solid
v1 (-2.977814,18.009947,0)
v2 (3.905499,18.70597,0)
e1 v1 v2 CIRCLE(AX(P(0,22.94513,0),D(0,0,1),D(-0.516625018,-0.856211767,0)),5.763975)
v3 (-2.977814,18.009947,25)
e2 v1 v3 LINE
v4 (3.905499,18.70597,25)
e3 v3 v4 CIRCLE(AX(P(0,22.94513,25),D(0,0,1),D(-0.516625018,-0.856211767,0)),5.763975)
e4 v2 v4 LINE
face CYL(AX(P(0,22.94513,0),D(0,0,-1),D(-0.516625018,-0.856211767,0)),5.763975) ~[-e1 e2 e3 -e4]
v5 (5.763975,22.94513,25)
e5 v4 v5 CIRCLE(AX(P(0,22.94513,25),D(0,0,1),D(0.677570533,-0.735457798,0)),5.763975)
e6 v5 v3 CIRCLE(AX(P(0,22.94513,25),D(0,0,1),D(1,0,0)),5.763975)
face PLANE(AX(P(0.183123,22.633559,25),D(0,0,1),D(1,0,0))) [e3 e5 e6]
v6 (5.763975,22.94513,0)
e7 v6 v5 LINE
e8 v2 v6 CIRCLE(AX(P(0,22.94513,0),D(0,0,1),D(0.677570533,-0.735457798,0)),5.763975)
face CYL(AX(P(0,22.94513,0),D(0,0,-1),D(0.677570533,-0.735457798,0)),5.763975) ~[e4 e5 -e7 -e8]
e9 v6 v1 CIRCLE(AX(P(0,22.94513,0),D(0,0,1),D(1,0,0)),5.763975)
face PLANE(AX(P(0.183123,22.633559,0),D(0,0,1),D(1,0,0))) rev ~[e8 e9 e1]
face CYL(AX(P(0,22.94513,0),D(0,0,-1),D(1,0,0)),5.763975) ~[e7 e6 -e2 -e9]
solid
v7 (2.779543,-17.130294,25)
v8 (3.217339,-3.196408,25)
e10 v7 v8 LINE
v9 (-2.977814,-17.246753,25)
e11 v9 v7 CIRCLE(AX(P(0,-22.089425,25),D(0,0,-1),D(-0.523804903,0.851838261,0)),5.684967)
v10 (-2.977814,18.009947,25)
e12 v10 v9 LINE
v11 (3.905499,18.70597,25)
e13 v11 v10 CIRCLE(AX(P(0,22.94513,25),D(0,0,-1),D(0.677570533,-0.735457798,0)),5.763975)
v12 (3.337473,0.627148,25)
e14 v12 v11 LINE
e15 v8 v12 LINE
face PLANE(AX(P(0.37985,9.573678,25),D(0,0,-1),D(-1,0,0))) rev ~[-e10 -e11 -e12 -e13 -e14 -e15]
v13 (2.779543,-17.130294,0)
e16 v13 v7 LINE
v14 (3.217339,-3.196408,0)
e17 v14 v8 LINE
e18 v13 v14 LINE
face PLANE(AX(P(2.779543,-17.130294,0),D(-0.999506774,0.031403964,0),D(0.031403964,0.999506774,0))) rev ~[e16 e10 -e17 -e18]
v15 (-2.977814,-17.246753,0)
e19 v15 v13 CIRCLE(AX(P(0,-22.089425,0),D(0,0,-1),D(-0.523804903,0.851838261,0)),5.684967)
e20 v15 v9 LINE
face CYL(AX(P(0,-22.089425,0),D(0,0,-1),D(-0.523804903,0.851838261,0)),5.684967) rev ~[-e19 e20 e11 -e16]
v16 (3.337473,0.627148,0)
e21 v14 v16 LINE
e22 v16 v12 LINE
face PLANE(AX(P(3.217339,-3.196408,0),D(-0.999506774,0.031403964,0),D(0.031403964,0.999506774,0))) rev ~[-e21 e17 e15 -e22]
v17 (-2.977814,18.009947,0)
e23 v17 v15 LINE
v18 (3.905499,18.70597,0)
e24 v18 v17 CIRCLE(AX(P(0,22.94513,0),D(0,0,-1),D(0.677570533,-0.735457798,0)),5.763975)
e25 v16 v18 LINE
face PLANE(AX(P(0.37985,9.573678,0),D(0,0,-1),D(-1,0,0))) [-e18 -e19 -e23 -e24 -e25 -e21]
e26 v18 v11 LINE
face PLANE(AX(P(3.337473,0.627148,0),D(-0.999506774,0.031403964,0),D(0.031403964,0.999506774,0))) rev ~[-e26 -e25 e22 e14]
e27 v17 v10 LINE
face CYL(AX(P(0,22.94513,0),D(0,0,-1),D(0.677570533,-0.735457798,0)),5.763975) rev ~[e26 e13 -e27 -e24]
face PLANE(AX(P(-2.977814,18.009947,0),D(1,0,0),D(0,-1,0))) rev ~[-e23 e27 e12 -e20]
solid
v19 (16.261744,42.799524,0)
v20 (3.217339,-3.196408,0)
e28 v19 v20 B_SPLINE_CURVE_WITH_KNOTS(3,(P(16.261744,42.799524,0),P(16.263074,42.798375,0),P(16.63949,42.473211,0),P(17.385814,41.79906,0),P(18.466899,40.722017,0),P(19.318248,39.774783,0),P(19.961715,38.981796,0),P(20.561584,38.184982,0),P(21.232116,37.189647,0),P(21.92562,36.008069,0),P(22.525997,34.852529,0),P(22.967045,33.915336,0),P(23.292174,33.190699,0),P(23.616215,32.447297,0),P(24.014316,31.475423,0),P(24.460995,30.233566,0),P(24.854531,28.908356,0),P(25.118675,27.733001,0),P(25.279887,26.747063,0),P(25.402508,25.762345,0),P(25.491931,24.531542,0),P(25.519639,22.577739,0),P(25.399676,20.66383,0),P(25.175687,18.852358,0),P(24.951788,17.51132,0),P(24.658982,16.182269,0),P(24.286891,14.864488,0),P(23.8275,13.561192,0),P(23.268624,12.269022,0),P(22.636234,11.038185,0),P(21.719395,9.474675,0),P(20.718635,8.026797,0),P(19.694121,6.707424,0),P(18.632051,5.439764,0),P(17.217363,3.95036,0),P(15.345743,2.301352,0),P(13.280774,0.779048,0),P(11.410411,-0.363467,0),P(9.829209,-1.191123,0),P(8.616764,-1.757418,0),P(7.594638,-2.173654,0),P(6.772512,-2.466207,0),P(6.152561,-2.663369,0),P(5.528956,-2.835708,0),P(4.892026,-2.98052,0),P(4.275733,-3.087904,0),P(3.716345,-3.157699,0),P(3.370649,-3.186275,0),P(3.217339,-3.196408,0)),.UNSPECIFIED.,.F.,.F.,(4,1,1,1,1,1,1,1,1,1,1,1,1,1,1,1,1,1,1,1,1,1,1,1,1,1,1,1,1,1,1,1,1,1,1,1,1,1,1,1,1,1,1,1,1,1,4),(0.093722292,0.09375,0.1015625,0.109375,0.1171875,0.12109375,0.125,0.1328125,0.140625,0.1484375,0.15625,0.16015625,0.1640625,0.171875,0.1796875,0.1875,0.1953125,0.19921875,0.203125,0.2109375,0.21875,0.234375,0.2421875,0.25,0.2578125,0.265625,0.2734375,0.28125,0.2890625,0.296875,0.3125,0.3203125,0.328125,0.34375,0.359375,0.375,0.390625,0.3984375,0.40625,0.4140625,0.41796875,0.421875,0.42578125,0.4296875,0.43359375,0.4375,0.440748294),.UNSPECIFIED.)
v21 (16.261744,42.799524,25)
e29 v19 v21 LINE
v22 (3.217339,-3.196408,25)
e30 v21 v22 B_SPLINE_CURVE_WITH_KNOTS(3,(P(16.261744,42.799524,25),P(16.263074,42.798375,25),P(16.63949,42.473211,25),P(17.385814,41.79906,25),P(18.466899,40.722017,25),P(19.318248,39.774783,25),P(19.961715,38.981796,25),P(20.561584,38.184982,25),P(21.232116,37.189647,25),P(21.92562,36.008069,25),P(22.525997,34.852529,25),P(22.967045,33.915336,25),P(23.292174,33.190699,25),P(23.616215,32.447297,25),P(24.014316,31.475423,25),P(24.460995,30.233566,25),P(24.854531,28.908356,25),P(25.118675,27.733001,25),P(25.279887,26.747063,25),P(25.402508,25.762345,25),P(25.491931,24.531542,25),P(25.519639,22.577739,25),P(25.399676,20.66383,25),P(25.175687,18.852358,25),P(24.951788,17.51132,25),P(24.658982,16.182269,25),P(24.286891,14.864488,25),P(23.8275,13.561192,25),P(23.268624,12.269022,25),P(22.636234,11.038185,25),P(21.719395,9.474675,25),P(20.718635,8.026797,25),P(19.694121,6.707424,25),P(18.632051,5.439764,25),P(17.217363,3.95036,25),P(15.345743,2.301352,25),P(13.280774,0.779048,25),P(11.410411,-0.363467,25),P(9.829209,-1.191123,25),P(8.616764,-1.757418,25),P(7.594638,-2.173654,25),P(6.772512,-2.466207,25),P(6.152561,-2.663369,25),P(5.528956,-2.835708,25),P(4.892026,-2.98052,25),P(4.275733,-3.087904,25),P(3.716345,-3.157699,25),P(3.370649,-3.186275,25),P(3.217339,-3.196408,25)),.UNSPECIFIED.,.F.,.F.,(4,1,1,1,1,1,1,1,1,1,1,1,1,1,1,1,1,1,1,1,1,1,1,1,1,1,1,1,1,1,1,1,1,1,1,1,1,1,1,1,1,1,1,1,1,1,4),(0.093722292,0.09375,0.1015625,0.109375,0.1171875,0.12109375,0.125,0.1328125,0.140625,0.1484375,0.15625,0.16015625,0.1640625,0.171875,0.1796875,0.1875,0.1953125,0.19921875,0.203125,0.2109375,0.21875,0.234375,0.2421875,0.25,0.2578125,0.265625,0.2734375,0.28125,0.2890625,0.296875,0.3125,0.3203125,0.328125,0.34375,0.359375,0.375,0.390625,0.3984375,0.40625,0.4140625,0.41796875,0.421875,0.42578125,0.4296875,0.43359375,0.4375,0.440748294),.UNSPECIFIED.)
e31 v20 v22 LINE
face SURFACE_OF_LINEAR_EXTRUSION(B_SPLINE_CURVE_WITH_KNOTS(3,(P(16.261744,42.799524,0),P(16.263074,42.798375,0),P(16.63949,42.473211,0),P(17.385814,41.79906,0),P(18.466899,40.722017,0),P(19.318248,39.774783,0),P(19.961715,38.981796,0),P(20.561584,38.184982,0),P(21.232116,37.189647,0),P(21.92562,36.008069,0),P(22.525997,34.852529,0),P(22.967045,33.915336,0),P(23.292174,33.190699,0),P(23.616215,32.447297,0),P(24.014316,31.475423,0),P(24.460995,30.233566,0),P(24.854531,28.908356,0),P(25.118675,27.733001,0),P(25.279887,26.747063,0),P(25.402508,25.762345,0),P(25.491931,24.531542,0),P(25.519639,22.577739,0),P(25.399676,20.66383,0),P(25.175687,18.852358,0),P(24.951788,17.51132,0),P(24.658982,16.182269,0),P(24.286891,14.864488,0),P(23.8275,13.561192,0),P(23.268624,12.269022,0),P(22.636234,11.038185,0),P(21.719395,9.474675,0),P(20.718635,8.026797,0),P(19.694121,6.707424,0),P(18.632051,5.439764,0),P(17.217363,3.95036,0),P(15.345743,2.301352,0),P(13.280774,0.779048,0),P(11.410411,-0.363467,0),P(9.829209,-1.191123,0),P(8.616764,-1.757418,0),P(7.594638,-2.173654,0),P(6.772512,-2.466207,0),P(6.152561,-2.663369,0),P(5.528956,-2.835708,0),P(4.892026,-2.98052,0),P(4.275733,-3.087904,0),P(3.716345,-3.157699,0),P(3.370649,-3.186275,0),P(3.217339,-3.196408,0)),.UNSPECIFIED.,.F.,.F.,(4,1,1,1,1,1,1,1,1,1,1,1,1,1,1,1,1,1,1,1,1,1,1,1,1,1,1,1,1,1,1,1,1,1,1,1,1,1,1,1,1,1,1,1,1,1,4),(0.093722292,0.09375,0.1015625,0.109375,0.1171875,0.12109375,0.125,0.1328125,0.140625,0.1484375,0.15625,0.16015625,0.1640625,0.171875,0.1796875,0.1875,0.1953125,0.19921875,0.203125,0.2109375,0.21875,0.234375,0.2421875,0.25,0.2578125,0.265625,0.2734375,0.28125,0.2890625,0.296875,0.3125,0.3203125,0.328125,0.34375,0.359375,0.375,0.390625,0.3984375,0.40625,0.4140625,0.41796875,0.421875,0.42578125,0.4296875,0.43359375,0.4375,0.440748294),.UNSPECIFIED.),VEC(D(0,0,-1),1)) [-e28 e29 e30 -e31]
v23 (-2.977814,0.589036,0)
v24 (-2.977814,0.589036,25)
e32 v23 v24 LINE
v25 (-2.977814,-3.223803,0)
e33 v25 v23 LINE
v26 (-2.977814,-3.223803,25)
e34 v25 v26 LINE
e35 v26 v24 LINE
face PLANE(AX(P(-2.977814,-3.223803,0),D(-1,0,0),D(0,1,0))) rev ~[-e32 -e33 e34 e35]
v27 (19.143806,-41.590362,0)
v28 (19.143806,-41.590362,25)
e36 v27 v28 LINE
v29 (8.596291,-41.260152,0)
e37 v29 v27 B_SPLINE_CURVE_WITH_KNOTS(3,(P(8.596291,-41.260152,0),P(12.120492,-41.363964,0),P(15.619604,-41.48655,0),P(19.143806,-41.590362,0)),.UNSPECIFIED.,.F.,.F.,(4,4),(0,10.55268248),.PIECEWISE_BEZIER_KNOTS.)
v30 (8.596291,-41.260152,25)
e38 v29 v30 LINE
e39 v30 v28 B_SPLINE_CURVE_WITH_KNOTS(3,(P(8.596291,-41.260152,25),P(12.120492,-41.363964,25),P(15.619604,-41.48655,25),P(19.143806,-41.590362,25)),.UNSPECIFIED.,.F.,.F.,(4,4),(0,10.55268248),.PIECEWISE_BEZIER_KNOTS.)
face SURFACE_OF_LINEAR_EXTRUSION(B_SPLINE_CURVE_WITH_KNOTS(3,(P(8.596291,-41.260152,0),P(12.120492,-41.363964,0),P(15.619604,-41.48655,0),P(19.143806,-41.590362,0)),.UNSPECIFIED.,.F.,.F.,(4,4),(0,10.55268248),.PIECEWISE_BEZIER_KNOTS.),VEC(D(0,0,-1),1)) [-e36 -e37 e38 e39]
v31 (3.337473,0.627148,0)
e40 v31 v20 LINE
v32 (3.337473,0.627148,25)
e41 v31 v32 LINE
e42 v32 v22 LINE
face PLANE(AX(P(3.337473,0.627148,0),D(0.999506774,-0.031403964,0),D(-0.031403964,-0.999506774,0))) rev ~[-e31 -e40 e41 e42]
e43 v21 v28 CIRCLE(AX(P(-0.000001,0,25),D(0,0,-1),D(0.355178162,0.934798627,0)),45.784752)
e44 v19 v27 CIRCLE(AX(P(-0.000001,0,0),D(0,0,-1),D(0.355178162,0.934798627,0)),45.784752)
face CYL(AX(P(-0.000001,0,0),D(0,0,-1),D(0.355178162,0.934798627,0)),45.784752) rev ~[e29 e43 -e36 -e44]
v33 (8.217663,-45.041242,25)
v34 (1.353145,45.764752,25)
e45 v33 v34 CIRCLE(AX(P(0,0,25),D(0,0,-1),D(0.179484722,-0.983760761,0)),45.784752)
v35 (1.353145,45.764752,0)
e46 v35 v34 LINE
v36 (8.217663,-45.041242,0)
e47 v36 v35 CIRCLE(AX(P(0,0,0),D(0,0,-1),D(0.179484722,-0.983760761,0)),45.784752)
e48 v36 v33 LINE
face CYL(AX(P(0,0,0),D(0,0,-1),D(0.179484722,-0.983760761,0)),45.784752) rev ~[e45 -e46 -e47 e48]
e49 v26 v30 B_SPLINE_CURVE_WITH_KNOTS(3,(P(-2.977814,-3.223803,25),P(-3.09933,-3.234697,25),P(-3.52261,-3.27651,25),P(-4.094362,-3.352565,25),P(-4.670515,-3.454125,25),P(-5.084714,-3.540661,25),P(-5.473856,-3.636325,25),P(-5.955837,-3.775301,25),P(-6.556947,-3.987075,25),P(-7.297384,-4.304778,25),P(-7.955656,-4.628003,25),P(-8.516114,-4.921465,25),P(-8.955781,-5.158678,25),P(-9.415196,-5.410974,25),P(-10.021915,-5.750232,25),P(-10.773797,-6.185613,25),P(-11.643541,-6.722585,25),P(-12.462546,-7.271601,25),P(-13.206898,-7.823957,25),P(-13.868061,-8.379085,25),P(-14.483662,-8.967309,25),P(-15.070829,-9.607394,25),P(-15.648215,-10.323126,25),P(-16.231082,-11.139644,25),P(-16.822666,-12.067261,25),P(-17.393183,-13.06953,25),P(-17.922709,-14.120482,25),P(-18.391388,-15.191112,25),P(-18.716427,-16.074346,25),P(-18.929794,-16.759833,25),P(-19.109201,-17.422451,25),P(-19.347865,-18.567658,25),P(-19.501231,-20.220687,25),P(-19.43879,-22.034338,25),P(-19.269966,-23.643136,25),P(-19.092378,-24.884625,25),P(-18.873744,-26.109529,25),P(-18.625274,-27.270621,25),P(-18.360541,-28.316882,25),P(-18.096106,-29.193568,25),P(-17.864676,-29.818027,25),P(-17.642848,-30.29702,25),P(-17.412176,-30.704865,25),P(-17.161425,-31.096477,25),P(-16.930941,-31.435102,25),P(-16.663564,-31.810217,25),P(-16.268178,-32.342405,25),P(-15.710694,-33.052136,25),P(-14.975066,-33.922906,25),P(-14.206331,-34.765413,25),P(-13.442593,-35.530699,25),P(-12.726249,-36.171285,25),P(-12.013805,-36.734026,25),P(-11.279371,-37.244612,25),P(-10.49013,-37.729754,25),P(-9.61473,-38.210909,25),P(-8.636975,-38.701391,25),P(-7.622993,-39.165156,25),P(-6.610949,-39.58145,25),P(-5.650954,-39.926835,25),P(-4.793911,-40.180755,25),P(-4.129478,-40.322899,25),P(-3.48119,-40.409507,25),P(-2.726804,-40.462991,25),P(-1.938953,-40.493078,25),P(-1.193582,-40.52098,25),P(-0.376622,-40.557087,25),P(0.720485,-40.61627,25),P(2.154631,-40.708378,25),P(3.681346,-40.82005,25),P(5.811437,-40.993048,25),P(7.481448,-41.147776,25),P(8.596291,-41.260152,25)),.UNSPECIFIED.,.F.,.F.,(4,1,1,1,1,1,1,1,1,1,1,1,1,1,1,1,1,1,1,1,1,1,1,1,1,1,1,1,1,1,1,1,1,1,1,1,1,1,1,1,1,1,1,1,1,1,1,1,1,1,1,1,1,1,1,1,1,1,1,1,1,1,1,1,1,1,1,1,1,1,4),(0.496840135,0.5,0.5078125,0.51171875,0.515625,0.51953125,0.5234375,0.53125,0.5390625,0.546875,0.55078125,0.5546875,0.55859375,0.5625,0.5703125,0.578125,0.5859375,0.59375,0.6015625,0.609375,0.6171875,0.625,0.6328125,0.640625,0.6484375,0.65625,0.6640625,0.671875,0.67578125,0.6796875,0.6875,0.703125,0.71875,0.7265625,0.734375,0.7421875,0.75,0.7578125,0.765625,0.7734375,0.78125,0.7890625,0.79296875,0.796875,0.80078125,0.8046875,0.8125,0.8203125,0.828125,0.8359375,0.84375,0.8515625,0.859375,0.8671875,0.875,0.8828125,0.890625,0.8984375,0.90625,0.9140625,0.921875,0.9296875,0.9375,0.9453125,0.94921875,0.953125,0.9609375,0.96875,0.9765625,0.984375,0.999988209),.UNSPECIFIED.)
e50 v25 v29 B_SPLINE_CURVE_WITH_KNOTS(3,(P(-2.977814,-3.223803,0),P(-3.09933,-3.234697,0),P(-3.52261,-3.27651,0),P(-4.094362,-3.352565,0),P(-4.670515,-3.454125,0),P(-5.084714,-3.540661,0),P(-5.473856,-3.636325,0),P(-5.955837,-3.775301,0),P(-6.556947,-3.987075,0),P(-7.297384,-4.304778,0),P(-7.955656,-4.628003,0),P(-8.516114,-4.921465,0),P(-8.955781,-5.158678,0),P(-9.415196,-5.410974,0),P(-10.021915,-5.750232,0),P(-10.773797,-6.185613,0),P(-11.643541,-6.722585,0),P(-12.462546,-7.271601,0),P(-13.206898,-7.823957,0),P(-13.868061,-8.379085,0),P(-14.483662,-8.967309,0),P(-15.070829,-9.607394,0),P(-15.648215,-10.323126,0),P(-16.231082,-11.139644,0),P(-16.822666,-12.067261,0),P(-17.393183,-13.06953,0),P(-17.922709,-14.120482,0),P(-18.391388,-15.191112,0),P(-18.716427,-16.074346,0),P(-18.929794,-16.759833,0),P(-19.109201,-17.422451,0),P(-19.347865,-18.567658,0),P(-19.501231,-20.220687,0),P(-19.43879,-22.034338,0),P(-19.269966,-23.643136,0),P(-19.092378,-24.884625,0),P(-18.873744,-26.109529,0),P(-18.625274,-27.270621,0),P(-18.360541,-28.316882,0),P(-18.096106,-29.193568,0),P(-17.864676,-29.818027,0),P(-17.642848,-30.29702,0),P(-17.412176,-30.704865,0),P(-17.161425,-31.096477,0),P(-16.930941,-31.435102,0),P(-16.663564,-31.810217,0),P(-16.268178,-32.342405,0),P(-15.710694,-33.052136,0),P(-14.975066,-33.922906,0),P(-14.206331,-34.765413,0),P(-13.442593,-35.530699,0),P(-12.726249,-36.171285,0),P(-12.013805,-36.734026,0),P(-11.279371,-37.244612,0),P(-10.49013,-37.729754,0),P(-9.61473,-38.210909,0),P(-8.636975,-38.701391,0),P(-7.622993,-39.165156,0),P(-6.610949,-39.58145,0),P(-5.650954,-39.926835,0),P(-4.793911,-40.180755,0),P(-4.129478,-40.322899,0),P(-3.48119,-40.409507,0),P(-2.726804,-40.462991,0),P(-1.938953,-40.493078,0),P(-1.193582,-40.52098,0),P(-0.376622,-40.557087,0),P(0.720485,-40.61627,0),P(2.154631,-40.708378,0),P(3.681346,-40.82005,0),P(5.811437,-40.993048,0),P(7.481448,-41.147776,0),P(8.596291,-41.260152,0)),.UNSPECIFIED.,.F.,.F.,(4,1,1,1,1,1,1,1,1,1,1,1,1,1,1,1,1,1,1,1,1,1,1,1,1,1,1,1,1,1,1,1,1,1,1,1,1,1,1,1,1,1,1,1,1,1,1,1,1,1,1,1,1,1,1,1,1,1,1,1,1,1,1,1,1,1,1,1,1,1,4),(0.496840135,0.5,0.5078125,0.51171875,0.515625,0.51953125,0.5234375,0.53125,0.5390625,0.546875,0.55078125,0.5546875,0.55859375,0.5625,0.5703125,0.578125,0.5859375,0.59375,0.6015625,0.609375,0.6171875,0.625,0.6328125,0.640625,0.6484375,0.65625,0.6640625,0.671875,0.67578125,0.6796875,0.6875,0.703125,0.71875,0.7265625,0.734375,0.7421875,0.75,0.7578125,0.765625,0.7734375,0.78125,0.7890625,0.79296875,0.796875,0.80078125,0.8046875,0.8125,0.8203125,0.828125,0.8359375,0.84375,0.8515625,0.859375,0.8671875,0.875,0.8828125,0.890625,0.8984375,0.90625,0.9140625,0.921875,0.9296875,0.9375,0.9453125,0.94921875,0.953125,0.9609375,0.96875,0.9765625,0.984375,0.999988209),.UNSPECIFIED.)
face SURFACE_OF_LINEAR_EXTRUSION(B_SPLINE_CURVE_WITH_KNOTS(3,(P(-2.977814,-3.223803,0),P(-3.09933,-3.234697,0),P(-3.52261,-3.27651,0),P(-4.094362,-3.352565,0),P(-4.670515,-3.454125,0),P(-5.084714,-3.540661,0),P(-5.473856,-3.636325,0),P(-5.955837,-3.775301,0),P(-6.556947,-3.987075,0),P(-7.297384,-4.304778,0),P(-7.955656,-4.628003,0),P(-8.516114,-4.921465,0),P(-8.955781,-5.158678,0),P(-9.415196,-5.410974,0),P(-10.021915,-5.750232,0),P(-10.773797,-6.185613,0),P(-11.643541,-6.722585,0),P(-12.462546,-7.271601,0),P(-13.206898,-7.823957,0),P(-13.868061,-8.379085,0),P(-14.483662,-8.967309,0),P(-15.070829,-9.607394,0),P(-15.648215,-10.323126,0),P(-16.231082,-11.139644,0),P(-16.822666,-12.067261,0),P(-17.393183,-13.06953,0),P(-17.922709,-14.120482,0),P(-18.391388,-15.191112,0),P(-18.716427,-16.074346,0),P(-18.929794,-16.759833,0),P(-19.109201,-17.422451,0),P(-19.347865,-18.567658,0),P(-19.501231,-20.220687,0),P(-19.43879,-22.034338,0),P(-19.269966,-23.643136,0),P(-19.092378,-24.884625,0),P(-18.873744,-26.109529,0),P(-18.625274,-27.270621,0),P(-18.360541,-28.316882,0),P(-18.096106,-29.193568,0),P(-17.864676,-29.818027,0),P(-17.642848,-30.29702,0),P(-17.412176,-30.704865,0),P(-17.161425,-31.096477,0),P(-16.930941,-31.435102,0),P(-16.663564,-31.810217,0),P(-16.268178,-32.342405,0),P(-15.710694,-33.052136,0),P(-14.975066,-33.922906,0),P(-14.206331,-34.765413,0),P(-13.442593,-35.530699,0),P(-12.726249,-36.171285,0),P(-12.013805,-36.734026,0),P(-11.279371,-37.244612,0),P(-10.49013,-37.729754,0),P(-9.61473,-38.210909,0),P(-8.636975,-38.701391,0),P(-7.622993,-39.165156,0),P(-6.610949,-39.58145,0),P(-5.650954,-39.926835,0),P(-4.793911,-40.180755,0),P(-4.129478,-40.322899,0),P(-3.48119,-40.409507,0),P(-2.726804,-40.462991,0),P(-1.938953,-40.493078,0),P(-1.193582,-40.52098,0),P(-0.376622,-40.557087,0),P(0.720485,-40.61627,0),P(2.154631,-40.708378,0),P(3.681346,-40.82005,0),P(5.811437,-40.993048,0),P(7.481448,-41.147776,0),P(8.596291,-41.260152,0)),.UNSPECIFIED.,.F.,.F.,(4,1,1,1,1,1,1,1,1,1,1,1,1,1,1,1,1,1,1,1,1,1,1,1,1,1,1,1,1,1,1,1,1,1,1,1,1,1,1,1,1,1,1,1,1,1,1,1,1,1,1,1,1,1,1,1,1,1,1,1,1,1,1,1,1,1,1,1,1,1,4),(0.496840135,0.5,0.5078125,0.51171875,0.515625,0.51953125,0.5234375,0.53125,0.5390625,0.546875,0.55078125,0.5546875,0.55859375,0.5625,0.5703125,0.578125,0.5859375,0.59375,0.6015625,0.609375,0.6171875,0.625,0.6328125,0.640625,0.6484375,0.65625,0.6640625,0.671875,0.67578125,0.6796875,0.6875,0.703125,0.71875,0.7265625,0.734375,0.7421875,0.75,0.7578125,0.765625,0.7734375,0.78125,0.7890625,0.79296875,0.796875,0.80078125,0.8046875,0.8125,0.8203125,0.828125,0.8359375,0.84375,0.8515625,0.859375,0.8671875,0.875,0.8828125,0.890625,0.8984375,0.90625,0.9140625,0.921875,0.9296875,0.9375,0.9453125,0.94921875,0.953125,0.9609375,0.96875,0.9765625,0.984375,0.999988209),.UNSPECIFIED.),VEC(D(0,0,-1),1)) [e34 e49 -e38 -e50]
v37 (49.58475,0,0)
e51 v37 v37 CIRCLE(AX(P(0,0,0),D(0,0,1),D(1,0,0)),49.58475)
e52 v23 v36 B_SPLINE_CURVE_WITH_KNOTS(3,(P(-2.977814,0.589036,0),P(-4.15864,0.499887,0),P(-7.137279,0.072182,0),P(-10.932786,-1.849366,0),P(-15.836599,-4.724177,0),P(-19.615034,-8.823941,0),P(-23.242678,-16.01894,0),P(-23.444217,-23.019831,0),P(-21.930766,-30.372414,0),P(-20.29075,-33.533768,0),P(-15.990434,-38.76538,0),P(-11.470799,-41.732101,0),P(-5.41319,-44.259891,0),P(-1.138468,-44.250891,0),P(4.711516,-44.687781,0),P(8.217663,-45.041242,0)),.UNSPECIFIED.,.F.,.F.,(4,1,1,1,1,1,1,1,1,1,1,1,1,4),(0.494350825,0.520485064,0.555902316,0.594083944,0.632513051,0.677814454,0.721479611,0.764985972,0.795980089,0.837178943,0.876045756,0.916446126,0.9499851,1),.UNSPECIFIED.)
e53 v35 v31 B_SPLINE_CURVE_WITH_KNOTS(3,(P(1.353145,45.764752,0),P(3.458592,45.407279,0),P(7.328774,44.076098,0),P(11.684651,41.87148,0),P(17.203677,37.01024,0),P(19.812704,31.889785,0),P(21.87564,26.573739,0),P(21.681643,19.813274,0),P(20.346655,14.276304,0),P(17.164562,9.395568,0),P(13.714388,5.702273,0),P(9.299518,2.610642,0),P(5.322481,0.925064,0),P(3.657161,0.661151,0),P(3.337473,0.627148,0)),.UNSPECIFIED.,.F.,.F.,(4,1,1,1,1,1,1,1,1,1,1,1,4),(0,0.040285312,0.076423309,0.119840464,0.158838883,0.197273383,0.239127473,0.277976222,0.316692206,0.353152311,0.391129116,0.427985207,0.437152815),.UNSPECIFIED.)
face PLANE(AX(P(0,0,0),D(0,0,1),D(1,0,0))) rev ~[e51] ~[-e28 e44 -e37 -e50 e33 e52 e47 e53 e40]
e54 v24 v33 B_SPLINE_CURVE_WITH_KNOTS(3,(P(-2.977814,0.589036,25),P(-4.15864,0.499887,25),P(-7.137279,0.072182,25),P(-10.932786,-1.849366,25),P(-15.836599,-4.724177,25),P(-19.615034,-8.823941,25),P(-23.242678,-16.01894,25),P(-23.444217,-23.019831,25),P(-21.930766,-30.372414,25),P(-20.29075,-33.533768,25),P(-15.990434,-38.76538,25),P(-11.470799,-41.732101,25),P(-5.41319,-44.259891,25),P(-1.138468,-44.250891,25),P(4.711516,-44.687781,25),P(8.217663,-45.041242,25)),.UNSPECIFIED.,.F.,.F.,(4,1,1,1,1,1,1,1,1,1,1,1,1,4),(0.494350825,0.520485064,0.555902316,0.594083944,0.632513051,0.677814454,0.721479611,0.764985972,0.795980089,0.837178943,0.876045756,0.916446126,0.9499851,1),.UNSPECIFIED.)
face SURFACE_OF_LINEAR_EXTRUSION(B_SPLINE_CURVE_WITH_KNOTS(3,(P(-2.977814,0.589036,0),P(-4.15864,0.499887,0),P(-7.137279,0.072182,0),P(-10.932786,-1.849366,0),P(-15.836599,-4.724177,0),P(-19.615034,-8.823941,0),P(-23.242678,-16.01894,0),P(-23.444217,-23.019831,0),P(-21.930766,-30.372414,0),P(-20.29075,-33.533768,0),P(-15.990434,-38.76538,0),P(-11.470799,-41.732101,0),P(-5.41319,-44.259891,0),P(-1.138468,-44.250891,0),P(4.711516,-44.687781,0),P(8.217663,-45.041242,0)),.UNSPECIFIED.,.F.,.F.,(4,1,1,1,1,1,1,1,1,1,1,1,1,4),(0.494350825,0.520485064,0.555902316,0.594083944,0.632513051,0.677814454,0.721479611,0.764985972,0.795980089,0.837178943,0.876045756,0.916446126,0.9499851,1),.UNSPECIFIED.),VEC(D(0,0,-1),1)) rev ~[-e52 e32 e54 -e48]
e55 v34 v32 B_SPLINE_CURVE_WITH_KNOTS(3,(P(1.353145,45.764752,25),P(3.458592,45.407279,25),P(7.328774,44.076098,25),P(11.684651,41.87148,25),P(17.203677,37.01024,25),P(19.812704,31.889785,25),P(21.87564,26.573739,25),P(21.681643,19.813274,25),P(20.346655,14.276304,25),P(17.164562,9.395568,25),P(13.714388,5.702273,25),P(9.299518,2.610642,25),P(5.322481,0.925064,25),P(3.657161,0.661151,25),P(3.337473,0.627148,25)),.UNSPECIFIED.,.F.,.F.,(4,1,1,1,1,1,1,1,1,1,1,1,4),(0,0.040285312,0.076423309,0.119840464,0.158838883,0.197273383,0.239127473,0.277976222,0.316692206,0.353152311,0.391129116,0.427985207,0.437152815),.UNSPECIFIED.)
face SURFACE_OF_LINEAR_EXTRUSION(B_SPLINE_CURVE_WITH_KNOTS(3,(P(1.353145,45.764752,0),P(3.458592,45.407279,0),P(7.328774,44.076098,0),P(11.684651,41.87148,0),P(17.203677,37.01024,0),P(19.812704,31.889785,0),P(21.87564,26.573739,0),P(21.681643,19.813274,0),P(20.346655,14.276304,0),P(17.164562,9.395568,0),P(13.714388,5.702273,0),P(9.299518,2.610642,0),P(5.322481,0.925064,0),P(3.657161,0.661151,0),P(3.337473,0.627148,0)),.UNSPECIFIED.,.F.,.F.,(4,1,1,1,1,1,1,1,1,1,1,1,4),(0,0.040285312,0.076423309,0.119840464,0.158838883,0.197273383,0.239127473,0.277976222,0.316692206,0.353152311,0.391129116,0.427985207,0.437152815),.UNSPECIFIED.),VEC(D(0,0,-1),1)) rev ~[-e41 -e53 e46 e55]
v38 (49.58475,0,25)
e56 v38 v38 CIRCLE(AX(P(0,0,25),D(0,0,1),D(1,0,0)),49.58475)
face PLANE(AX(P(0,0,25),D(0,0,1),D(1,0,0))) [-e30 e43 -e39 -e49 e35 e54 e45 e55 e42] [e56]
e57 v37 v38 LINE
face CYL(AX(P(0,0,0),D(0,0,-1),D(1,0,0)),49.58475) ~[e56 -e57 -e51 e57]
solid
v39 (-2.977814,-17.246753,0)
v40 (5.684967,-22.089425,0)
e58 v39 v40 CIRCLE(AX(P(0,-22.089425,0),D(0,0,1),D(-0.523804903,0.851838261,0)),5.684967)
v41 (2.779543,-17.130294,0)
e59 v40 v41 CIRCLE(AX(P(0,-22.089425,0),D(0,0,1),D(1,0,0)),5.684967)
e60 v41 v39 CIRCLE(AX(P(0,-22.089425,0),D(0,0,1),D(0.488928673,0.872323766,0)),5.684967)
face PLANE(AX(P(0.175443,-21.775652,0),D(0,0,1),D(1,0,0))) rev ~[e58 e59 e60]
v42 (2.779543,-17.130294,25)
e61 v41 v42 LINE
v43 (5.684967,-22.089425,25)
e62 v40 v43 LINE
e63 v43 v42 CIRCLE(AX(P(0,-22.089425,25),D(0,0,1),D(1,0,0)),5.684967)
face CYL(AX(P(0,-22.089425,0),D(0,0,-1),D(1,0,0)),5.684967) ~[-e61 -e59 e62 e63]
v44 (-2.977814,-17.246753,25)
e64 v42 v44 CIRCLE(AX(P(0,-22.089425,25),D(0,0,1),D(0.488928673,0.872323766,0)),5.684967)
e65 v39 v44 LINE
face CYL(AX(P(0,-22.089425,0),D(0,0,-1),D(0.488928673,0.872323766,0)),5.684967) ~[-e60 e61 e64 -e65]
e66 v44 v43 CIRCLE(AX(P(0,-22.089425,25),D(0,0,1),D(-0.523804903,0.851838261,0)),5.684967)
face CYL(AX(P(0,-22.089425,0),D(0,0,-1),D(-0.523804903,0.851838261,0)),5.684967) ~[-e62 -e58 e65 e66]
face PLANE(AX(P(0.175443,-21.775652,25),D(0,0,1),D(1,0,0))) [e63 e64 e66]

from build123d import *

# Parameters (mm, degrees)
F0_R     = 49.5847500937
F1_DEPTH = 25
F2_DEPTH = 25
F3_DEPTH = 25


# Not quite as in the source:
# - ends of sketch curves that miss each other by under 0.0002 mm in the source are joined
# - the dataset's text gives a spline's control points without its knots; the knots are read off the source's solid


with BuildPart() as f1:
    # F0 (on Top) → F1 (new body)
    with BuildSketch(Plane.XY):
        Circle(F0_R)
        with BuildLine():
            ThreePointArc((8.2176634504, -45.0412423256), (-45.6544875488, -3.451270704), (1.3531451114, 45.7647517323))
            add(Edge.make_bspline(
                [(1.3531451114, 45.7647517323), (3.4585917741, 45.4072790873), (7.3287739419, 44.0760975566), (11.6846514785, 41.8714803536), (17.2036766267, 37.0102398582), (19.8127043525, 31.889785288), (21.8756398334, 26.5737392046), (21.6816430924, 19.8132738016), (20.3466547431, 14.27630368), (17.1645617239, 9.3955679535), (13.7143876632, 5.7022727088), (9.2995178681, 2.6106423405), (5.3224811985, 0.9250643675), (3.6571614218, 0.6611514177), (3.3374725899, 0.6271477481)],
                knots=[0, 0, 0, 0, 0.0402853124, 0.0764233093, 0.1198404643, 0.1588388833, 0.1972733831, 0.2391274731, 0.2779762224, 0.316692206, 0.3531523115, 0.3911291162, 0.4279852066, 0.4371528151, 0.4371528151, 0.4371528151, 0.4371528151], degree=3))
            Line((3.3374725899, 0.6271477481), (3.2173385291, -3.1964079792))
            add(Edge.make_bspline(
                [(16.2617436608, 42.799524033), (16.2630739599, 42.7983750489), (16.6394904754, 42.4732106597), (17.3858142501, 41.7990598434), (18.4668991951, 40.7220167717), (19.3182477466, 39.7747828486), (19.9617151083, 38.9817963008), (20.5615839282, 38.1849818374), (21.2321159557, 37.1896473658), (21.9256201889, 36.0080693011), (22.5259973397, 34.8525285732), (22.9670449801, 33.9153363369), (23.2921740837, 33.1906991104), (23.6162146728, 32.4472971946), (24.0143162389, 31.4754225057), (24.4609945217, 30.2335663035), (24.8545309775, 28.9083557538), (25.1186753026, 27.7330012889), (25.2798865775, 26.7470627199), (25.4025078808, 25.7623445898), (25.4919314322, 24.5315424236), (25.5196391676, 22.5777387036), (25.3996756527, 20.6638298862), (25.1756871665, 18.8523584922), (24.9517875546, 17.5113201902), (24.6589823135, 16.1822687794), (24.2868913691, 14.8644876192), (23.8274995758, 13.5611922588), (23.2686241638, 12.2690224458), (22.636234168, 11.0381846903), (21.7193953434, 9.4746754172), (20.7186347445, 8.0267968339), (19.6941212898, 6.7074239992), (18.6320508644, 5.4397638391), (17.2173630119, 3.9503603048), (15.3457425226, 2.3013523369), (13.2807742381, 0.7790477359), (11.410410694, -0.3634671801), (9.8292090796, -1.1911232786), (8.6167642486, -1.7574183512), (7.5946383314, -2.1736542592), (6.7725118163, -2.466207369), (6.1525609715, -2.6633692461), (5.5289556877, -2.8357079446), (4.8920257832, -2.9805203679), (4.2757329412, -3.0879036918), (3.7163451386, -3.1576990689), (3.3706493697, -3.1862748398), (3.2173385291, -3.1964079792)],
                knots=[0.0937222925, 0.0937222925, 0.0937222925, 0.0937222925, 0.09375, 0.1015625, 0.109375, 0.1171875, 0.12109375, 0.125, 0.1328125, 0.140625, 0.1484375, 0.15625, 0.16015625, 0.1640625, 0.171875, 0.1796875, 0.1875, 0.1953125, 0.19921875, 0.203125, 0.2109375, 0.21875, 0.234375, 0.2421875, 0.25, 0.2578125, 0.265625, 0.2734375, 0.28125, 0.2890625, 0.296875, 0.3125, 0.3203125, 0.328125, 0.34375, 0.359375, 0.375, 0.390625, 0.3984375, 0.40625, 0.4140625, 0.41796875, 0.421875, 0.42578125, 0.4296875, 0.43359375, 0.4375, 0.4407482936, 0.4407482936, 0.4407482936, 0.4407482936], degree=3))
            ThreePointArc((16.2617436608, 42.799524033), (45.7580748478, 1.562718476), (19.1438057271, -41.5903619256))
            add(Edge.make_bspline(
                [(8.5962909195, -41.260151535), (12.1204923737, -41.363963585), (15.6196042728, -41.4865498756), (19.1438057271, -41.5903619256)],
                knots=[0, 0, 0, 0, 10.5526824798, 10.5526824798, 10.5526824798, 10.5526824798], degree=3))
            add(Edge.make_bspline(
                [(-2.9778135602, -3.2238034948), (-3.0993303434, -3.2346970109), (-3.5226099021, -3.2765098979), (-4.0943616278, -3.3525652097), (-4.6705152555, -3.4541250007), (-5.0847144346, -3.5406614246), (-5.4738562213, -3.6363249493), (-5.9558372613, -3.7753006958), (-6.5569469588, -3.9870752932), (-7.2973844437, -4.3047776604), (-7.9556555023, -4.6280032377), (-8.5161141524, -4.9214653693), (-8.9557811473, -5.1586784651), (-9.4151958546, -5.4109743655), (-10.0219149467, -5.7502319027), (-10.7737966428, -6.1856132196), (-11.6435407711, -6.7225847478), (-12.4625455113, -7.2716014199), (-13.2068980448, -7.8239565682), (-13.8680607713, -8.3790853884), (-14.4836619801, -8.9673086499), (-15.0708287585, -9.6073944046), (-15.6482154954, -10.3231261961), (-16.2310819184, -11.1396443892), (-16.8226660281, -12.067261276), (-17.3931826033, -13.069530031), (-17.9227093669, -14.1204821222), (-18.3913882315, -15.1911115172), (-18.7164274723, -16.0743456961), (-18.9297942343, -16.7598333424), (-19.1092008222, -17.4224508448), (-19.3478650369, -18.567657804), (-19.5012310474, -20.2206869085), (-19.4387898602, -22.0343384025), (-19.2699656101, -23.6431361243), (-19.0923777518, -24.8846250566), (-18.8737440335, -26.1095288943), (-18.625273925, -27.270620982), (-18.3605406415, -28.3168815895), (-18.0961057427, -29.1935677611), (-17.8646757486, -29.8180269836), (-17.6428484123, -30.2970196235), (-17.4121763438, -30.7048654836), (-17.1614245266, -31.0964767945), (-16.9309413758, -31.4351019183), (-16.6635644382, -31.8102169288), (-16.2681781339, -32.3424050242), (-15.7106938903, -33.0521363879), (-14.975065644, -33.9229060282), (-14.2063314903, -34.7654131508), (-13.4425929357, -35.5306986434), (-12.7262486355, -36.1712848535), (-12.0138047109, -36.7340261464), (-11.2793708954, -37.2446124357), (-10.4901303857, -37.7297538058), (-9.6147303473, -38.2109085157), (-8.6369747009, -38.7013911181), (-7.6229933124, -39.1651555732), (-6.6109485553, -39.5814499067), (-5.6509540017, -39.9268354746), (-4.7939114132, -40.1807551658), (-4.129478245, -40.3228988125), (-3.4811896898, -40.4095071611), (-2.7268043347, -40.4629905381), (-1.938953452, -40.4930779164), (-1.1935823718, -40.5209796742), (-0.3766220477, -40.5570865106), (0.7204845182, -40.6162695454), (2.1546311267, -40.7083776943), (3.6813461565, -40.8200495776), (5.8114367714, -40.9930475683), (7.4814477769, -41.1477758014), (8.5962909195, -41.260151535)],
                knots=[0.4968401346, 0.4968401346, 0.4968401346, 0.4968401346, 0.5, 0.5078125, 0.51171875, 0.515625, 0.51953125, 0.5234375, 0.53125, 0.5390625, 0.546875, 0.55078125, 0.5546875, 0.55859375, 0.5625, 0.5703125, 0.578125, 0.5859375, 0.59375, 0.6015625, 0.609375, 0.6171875, 0.625, 0.6328125, 0.640625, 0.6484375, 0.65625, 0.6640625, 0.671875, 0.67578125, 0.6796875, 0.6875, 0.703125, 0.71875, 0.7265625, 0.734375, 0.7421875, 0.75, 0.7578125, 0.765625, 0.7734375, 0.78125, 0.7890625, 0.79296875, 0.796875, 0.80078125, 0.8046875, 0.8125, 0.8203125, 0.828125, 0.8359375, 0.84375, 0.8515625, 0.859375, 0.8671875, 0.875, 0.8828125, 0.890625, 0.8984375, 0.90625, 0.9140625, 0.921875, 0.9296875, 0.9375, 0.9453125, 0.94921875, 0.953125, 0.9609375, 0.96875, 0.9765625, 0.984375, 0.9999882092, 0.9999882092, 0.9999882092, 0.9999882092], degree=3))
            Line((-2.9778135602, -3.2238034948), (-2.9778135602, 0.5890359777))
            add(Edge.make_bspline(
                [(-2.9778135602, 0.5890359777), (-4.1586395197, 0.4998871799), (-7.1372789822, 0.0721815891), (-10.9327858042, -1.8493664697), (-15.8365992647, -4.7241770818), (-19.6150340779, -8.8239411152), (-23.2426783003, -16.0189399303), (-23.4442169592, -23.0198313597), (-21.9307663935, -30.3724139092), (-20.290749593, -33.533767655), (-15.9904342503, -38.7653797506), (-11.4707989198, -41.7321009373), (-5.4131902795, -44.2598907097), (-1.1384676764, -44.2508911848), (4.71151601, -44.6877810107), (8.2176634504, -45.0412423256)],
                knots=[0.4943508245, 0.4943508245, 0.4943508245, 0.4943508245, 0.5204850635, 0.5559023161, 0.5940839436, 0.6325130511, 0.6778144538, 0.7214796109, 0.7649859717, 0.7959800891, 0.8371789433, 0.8760457564, 0.9164461256, 0.9499850996, 1, 1, 1, 1], degree=3))
        make_face(mode=Mode.SUBTRACT)
    extrude(amount=F1_DEPTH)


with BuildPart() as f2:
    # F0 (on Top) → F2 (new body)
    with BuildSketch(Plane.XY):
        with BuildLine():
            ThreePointArc((-2.9778135602, 18.0099472335), (0.579881213, 17.2103989752), (3.905499446, 18.705970065))
            ThreePointArc((3.905499446, 18.705970065), (5.2789490027, 20.6308047759), (5.7639747523, 22.9451302439))
            ThreePointArc((5.7639747523, 22.9451302439), (-2.8336692438, 27.9644652159), (-2.9778135602, 18.0099472335))
        make_face()
    extrude(amount=F2_DEPTH)


with BuildPart() as f2b:
    # F0 (on Top) → F2, piece 2 (new body)
    with BuildSketch(Plane.XY):
        with BuildLine():
            ThreePointArc((5.6849669477, -22.0894254744), (4.9051228964, -19.2156442427), (2.7795433476, -17.1302936981))
            ThreePointArc((2.7795433476, -17.1302936981), (-0.1149715971, -16.4056212266), (-2.9778135602, -17.2467531133))
            ThreePointArc((-2.9778135602, -17.2467531133), (-2.7739932886, -27.051663924), (5.6849669477, -22.0894254744))
        make_face()
    extrude(amount=F2_DEPTH)


with BuildPart() as f3:
    # F0 (on Top) → F3 (new body)
    with BuildSketch(Plane.XY):
        with BuildLine():
            add(Edge.make_bspline(
                [(3.3374725899, 0.6271477481), (2.7022433704, 0.5595816578), (1.179826551, 0.5744434161), (-0.8120762037, 0.7033344618), (-2.5254644471, 0.6231869712), (-2.9778135602, 0.5890359777)],
                knots=[0.4371528151, 0.4371528151, 0.4371528151, 0.4371528151, 0.4553690688, 0.4843393577, 0.4943508245, 0.4943508245, 0.4943508245, 0.4943508245], degree=3))
            Line((3.3374725899, 0.6271477481), (3.905499446, 18.705970065))
            ThreePointArc((3.905499446, 18.705970065), (0.579881213, 17.2103989752), (-2.9778135602, 18.0099472335))
            Line((-2.9778135602, 18.0099472335), (-2.9778135602, 0.5890359777))
        make_face()
        with BuildLine():
            Line((2.7795433476, -17.1302936981), (3.2173385291, -3.1964079792))
            add(Edge.make_bspline(
                [(3.2173385291, -3.1964079792), (3.0019201003, -3.2106461438), (2.4372674095, -3.2340467099), (1.7724022915, -3.2260045079), (1.2057258422, -3.207691837), (0.6565254191, -3.1863181965), (-0.002185073, -3.1588329743), (-0.7797750652, -3.1381263752), (-1.5744376242, -3.1401181706), (-2.3217399341, -3.1714582791), (-2.7988903766, -3.2077637137), (-2.9778135602, -3.2238034948)],
                knots=[0.4407482936, 0.4407482936, 0.4407482936, 0.4407482936, 0.4453125, 0.453125, 0.45703125, 0.4609375, 0.46875, 0.4765625, 0.484375, 0.4921875, 0.4968401346, 0.4968401346, 0.4968401346, 0.4968401346], degree=3))
            Line((-2.9778135602, -3.2238034948), (-2.9778135602, -17.2467531133))
            ThreePointArc((-2.9778135602, -17.2467531133), (-0.1149715971, -16.4056212266), (2.7795433476, -17.1302936981))
        make_face()
        with BuildLine():
            Line((3.2173385291, -3.1964079792), (3.3374725899, 0.6271477481))
            add(Edge.make_bspline(
                [(3.3374725899, 0.6271477481), (2.7022433704, 0.5595816578), (1.179826551, 0.5744434161), (-0.8120762037, 0.7033344618), (-2.5254644471, 0.6231869712), (-2.9778135602, 0.5890359777)],
                knots=[0.4371528151, 0.4371528151, 0.4371528151, 0.4371528151, 0.4553690688, 0.4843393577, 0.4943508245, 0.4943508245, 0.4943508245, 0.4943508245], degree=3))
            Line((-2.9778135602, 0.5890359777), (-2.9778135602, -3.2238034948))
            add(Edge.make_bspline(
                [(3.2173385291, -3.1964079792), (3.0019201003, -3.2106461438), (2.4372674095, -3.2340467099), (1.7724022915, -3.2260045079), (1.2057258422, -3.207691837), (0.6565254191, -3.1863181965), (-0.002185073, -3.1588329743), (-0.7797750652, -3.1381263752), (-1.5744376242, -3.1401181706), (-2.3217399341, -3.1714582791), (-2.7988903766, -3.2077637137), (-2.9778135602, -3.2238034948)],
                knots=[0.4407482936, 0.4407482936, 0.4407482936, 0.4407482936, 0.4453125, 0.453125, 0.45703125, 0.4609375, 0.46875, 0.4765625, 0.484375, 0.4921875, 0.4968401346, 0.4968401346, 0.4968401346, 0.4968401346], degree=3))
        make_face()
    extrude(amount=F3_DEPTH)


solid = Compound([f1.part, f2.part, f2b.part, f3.part])
